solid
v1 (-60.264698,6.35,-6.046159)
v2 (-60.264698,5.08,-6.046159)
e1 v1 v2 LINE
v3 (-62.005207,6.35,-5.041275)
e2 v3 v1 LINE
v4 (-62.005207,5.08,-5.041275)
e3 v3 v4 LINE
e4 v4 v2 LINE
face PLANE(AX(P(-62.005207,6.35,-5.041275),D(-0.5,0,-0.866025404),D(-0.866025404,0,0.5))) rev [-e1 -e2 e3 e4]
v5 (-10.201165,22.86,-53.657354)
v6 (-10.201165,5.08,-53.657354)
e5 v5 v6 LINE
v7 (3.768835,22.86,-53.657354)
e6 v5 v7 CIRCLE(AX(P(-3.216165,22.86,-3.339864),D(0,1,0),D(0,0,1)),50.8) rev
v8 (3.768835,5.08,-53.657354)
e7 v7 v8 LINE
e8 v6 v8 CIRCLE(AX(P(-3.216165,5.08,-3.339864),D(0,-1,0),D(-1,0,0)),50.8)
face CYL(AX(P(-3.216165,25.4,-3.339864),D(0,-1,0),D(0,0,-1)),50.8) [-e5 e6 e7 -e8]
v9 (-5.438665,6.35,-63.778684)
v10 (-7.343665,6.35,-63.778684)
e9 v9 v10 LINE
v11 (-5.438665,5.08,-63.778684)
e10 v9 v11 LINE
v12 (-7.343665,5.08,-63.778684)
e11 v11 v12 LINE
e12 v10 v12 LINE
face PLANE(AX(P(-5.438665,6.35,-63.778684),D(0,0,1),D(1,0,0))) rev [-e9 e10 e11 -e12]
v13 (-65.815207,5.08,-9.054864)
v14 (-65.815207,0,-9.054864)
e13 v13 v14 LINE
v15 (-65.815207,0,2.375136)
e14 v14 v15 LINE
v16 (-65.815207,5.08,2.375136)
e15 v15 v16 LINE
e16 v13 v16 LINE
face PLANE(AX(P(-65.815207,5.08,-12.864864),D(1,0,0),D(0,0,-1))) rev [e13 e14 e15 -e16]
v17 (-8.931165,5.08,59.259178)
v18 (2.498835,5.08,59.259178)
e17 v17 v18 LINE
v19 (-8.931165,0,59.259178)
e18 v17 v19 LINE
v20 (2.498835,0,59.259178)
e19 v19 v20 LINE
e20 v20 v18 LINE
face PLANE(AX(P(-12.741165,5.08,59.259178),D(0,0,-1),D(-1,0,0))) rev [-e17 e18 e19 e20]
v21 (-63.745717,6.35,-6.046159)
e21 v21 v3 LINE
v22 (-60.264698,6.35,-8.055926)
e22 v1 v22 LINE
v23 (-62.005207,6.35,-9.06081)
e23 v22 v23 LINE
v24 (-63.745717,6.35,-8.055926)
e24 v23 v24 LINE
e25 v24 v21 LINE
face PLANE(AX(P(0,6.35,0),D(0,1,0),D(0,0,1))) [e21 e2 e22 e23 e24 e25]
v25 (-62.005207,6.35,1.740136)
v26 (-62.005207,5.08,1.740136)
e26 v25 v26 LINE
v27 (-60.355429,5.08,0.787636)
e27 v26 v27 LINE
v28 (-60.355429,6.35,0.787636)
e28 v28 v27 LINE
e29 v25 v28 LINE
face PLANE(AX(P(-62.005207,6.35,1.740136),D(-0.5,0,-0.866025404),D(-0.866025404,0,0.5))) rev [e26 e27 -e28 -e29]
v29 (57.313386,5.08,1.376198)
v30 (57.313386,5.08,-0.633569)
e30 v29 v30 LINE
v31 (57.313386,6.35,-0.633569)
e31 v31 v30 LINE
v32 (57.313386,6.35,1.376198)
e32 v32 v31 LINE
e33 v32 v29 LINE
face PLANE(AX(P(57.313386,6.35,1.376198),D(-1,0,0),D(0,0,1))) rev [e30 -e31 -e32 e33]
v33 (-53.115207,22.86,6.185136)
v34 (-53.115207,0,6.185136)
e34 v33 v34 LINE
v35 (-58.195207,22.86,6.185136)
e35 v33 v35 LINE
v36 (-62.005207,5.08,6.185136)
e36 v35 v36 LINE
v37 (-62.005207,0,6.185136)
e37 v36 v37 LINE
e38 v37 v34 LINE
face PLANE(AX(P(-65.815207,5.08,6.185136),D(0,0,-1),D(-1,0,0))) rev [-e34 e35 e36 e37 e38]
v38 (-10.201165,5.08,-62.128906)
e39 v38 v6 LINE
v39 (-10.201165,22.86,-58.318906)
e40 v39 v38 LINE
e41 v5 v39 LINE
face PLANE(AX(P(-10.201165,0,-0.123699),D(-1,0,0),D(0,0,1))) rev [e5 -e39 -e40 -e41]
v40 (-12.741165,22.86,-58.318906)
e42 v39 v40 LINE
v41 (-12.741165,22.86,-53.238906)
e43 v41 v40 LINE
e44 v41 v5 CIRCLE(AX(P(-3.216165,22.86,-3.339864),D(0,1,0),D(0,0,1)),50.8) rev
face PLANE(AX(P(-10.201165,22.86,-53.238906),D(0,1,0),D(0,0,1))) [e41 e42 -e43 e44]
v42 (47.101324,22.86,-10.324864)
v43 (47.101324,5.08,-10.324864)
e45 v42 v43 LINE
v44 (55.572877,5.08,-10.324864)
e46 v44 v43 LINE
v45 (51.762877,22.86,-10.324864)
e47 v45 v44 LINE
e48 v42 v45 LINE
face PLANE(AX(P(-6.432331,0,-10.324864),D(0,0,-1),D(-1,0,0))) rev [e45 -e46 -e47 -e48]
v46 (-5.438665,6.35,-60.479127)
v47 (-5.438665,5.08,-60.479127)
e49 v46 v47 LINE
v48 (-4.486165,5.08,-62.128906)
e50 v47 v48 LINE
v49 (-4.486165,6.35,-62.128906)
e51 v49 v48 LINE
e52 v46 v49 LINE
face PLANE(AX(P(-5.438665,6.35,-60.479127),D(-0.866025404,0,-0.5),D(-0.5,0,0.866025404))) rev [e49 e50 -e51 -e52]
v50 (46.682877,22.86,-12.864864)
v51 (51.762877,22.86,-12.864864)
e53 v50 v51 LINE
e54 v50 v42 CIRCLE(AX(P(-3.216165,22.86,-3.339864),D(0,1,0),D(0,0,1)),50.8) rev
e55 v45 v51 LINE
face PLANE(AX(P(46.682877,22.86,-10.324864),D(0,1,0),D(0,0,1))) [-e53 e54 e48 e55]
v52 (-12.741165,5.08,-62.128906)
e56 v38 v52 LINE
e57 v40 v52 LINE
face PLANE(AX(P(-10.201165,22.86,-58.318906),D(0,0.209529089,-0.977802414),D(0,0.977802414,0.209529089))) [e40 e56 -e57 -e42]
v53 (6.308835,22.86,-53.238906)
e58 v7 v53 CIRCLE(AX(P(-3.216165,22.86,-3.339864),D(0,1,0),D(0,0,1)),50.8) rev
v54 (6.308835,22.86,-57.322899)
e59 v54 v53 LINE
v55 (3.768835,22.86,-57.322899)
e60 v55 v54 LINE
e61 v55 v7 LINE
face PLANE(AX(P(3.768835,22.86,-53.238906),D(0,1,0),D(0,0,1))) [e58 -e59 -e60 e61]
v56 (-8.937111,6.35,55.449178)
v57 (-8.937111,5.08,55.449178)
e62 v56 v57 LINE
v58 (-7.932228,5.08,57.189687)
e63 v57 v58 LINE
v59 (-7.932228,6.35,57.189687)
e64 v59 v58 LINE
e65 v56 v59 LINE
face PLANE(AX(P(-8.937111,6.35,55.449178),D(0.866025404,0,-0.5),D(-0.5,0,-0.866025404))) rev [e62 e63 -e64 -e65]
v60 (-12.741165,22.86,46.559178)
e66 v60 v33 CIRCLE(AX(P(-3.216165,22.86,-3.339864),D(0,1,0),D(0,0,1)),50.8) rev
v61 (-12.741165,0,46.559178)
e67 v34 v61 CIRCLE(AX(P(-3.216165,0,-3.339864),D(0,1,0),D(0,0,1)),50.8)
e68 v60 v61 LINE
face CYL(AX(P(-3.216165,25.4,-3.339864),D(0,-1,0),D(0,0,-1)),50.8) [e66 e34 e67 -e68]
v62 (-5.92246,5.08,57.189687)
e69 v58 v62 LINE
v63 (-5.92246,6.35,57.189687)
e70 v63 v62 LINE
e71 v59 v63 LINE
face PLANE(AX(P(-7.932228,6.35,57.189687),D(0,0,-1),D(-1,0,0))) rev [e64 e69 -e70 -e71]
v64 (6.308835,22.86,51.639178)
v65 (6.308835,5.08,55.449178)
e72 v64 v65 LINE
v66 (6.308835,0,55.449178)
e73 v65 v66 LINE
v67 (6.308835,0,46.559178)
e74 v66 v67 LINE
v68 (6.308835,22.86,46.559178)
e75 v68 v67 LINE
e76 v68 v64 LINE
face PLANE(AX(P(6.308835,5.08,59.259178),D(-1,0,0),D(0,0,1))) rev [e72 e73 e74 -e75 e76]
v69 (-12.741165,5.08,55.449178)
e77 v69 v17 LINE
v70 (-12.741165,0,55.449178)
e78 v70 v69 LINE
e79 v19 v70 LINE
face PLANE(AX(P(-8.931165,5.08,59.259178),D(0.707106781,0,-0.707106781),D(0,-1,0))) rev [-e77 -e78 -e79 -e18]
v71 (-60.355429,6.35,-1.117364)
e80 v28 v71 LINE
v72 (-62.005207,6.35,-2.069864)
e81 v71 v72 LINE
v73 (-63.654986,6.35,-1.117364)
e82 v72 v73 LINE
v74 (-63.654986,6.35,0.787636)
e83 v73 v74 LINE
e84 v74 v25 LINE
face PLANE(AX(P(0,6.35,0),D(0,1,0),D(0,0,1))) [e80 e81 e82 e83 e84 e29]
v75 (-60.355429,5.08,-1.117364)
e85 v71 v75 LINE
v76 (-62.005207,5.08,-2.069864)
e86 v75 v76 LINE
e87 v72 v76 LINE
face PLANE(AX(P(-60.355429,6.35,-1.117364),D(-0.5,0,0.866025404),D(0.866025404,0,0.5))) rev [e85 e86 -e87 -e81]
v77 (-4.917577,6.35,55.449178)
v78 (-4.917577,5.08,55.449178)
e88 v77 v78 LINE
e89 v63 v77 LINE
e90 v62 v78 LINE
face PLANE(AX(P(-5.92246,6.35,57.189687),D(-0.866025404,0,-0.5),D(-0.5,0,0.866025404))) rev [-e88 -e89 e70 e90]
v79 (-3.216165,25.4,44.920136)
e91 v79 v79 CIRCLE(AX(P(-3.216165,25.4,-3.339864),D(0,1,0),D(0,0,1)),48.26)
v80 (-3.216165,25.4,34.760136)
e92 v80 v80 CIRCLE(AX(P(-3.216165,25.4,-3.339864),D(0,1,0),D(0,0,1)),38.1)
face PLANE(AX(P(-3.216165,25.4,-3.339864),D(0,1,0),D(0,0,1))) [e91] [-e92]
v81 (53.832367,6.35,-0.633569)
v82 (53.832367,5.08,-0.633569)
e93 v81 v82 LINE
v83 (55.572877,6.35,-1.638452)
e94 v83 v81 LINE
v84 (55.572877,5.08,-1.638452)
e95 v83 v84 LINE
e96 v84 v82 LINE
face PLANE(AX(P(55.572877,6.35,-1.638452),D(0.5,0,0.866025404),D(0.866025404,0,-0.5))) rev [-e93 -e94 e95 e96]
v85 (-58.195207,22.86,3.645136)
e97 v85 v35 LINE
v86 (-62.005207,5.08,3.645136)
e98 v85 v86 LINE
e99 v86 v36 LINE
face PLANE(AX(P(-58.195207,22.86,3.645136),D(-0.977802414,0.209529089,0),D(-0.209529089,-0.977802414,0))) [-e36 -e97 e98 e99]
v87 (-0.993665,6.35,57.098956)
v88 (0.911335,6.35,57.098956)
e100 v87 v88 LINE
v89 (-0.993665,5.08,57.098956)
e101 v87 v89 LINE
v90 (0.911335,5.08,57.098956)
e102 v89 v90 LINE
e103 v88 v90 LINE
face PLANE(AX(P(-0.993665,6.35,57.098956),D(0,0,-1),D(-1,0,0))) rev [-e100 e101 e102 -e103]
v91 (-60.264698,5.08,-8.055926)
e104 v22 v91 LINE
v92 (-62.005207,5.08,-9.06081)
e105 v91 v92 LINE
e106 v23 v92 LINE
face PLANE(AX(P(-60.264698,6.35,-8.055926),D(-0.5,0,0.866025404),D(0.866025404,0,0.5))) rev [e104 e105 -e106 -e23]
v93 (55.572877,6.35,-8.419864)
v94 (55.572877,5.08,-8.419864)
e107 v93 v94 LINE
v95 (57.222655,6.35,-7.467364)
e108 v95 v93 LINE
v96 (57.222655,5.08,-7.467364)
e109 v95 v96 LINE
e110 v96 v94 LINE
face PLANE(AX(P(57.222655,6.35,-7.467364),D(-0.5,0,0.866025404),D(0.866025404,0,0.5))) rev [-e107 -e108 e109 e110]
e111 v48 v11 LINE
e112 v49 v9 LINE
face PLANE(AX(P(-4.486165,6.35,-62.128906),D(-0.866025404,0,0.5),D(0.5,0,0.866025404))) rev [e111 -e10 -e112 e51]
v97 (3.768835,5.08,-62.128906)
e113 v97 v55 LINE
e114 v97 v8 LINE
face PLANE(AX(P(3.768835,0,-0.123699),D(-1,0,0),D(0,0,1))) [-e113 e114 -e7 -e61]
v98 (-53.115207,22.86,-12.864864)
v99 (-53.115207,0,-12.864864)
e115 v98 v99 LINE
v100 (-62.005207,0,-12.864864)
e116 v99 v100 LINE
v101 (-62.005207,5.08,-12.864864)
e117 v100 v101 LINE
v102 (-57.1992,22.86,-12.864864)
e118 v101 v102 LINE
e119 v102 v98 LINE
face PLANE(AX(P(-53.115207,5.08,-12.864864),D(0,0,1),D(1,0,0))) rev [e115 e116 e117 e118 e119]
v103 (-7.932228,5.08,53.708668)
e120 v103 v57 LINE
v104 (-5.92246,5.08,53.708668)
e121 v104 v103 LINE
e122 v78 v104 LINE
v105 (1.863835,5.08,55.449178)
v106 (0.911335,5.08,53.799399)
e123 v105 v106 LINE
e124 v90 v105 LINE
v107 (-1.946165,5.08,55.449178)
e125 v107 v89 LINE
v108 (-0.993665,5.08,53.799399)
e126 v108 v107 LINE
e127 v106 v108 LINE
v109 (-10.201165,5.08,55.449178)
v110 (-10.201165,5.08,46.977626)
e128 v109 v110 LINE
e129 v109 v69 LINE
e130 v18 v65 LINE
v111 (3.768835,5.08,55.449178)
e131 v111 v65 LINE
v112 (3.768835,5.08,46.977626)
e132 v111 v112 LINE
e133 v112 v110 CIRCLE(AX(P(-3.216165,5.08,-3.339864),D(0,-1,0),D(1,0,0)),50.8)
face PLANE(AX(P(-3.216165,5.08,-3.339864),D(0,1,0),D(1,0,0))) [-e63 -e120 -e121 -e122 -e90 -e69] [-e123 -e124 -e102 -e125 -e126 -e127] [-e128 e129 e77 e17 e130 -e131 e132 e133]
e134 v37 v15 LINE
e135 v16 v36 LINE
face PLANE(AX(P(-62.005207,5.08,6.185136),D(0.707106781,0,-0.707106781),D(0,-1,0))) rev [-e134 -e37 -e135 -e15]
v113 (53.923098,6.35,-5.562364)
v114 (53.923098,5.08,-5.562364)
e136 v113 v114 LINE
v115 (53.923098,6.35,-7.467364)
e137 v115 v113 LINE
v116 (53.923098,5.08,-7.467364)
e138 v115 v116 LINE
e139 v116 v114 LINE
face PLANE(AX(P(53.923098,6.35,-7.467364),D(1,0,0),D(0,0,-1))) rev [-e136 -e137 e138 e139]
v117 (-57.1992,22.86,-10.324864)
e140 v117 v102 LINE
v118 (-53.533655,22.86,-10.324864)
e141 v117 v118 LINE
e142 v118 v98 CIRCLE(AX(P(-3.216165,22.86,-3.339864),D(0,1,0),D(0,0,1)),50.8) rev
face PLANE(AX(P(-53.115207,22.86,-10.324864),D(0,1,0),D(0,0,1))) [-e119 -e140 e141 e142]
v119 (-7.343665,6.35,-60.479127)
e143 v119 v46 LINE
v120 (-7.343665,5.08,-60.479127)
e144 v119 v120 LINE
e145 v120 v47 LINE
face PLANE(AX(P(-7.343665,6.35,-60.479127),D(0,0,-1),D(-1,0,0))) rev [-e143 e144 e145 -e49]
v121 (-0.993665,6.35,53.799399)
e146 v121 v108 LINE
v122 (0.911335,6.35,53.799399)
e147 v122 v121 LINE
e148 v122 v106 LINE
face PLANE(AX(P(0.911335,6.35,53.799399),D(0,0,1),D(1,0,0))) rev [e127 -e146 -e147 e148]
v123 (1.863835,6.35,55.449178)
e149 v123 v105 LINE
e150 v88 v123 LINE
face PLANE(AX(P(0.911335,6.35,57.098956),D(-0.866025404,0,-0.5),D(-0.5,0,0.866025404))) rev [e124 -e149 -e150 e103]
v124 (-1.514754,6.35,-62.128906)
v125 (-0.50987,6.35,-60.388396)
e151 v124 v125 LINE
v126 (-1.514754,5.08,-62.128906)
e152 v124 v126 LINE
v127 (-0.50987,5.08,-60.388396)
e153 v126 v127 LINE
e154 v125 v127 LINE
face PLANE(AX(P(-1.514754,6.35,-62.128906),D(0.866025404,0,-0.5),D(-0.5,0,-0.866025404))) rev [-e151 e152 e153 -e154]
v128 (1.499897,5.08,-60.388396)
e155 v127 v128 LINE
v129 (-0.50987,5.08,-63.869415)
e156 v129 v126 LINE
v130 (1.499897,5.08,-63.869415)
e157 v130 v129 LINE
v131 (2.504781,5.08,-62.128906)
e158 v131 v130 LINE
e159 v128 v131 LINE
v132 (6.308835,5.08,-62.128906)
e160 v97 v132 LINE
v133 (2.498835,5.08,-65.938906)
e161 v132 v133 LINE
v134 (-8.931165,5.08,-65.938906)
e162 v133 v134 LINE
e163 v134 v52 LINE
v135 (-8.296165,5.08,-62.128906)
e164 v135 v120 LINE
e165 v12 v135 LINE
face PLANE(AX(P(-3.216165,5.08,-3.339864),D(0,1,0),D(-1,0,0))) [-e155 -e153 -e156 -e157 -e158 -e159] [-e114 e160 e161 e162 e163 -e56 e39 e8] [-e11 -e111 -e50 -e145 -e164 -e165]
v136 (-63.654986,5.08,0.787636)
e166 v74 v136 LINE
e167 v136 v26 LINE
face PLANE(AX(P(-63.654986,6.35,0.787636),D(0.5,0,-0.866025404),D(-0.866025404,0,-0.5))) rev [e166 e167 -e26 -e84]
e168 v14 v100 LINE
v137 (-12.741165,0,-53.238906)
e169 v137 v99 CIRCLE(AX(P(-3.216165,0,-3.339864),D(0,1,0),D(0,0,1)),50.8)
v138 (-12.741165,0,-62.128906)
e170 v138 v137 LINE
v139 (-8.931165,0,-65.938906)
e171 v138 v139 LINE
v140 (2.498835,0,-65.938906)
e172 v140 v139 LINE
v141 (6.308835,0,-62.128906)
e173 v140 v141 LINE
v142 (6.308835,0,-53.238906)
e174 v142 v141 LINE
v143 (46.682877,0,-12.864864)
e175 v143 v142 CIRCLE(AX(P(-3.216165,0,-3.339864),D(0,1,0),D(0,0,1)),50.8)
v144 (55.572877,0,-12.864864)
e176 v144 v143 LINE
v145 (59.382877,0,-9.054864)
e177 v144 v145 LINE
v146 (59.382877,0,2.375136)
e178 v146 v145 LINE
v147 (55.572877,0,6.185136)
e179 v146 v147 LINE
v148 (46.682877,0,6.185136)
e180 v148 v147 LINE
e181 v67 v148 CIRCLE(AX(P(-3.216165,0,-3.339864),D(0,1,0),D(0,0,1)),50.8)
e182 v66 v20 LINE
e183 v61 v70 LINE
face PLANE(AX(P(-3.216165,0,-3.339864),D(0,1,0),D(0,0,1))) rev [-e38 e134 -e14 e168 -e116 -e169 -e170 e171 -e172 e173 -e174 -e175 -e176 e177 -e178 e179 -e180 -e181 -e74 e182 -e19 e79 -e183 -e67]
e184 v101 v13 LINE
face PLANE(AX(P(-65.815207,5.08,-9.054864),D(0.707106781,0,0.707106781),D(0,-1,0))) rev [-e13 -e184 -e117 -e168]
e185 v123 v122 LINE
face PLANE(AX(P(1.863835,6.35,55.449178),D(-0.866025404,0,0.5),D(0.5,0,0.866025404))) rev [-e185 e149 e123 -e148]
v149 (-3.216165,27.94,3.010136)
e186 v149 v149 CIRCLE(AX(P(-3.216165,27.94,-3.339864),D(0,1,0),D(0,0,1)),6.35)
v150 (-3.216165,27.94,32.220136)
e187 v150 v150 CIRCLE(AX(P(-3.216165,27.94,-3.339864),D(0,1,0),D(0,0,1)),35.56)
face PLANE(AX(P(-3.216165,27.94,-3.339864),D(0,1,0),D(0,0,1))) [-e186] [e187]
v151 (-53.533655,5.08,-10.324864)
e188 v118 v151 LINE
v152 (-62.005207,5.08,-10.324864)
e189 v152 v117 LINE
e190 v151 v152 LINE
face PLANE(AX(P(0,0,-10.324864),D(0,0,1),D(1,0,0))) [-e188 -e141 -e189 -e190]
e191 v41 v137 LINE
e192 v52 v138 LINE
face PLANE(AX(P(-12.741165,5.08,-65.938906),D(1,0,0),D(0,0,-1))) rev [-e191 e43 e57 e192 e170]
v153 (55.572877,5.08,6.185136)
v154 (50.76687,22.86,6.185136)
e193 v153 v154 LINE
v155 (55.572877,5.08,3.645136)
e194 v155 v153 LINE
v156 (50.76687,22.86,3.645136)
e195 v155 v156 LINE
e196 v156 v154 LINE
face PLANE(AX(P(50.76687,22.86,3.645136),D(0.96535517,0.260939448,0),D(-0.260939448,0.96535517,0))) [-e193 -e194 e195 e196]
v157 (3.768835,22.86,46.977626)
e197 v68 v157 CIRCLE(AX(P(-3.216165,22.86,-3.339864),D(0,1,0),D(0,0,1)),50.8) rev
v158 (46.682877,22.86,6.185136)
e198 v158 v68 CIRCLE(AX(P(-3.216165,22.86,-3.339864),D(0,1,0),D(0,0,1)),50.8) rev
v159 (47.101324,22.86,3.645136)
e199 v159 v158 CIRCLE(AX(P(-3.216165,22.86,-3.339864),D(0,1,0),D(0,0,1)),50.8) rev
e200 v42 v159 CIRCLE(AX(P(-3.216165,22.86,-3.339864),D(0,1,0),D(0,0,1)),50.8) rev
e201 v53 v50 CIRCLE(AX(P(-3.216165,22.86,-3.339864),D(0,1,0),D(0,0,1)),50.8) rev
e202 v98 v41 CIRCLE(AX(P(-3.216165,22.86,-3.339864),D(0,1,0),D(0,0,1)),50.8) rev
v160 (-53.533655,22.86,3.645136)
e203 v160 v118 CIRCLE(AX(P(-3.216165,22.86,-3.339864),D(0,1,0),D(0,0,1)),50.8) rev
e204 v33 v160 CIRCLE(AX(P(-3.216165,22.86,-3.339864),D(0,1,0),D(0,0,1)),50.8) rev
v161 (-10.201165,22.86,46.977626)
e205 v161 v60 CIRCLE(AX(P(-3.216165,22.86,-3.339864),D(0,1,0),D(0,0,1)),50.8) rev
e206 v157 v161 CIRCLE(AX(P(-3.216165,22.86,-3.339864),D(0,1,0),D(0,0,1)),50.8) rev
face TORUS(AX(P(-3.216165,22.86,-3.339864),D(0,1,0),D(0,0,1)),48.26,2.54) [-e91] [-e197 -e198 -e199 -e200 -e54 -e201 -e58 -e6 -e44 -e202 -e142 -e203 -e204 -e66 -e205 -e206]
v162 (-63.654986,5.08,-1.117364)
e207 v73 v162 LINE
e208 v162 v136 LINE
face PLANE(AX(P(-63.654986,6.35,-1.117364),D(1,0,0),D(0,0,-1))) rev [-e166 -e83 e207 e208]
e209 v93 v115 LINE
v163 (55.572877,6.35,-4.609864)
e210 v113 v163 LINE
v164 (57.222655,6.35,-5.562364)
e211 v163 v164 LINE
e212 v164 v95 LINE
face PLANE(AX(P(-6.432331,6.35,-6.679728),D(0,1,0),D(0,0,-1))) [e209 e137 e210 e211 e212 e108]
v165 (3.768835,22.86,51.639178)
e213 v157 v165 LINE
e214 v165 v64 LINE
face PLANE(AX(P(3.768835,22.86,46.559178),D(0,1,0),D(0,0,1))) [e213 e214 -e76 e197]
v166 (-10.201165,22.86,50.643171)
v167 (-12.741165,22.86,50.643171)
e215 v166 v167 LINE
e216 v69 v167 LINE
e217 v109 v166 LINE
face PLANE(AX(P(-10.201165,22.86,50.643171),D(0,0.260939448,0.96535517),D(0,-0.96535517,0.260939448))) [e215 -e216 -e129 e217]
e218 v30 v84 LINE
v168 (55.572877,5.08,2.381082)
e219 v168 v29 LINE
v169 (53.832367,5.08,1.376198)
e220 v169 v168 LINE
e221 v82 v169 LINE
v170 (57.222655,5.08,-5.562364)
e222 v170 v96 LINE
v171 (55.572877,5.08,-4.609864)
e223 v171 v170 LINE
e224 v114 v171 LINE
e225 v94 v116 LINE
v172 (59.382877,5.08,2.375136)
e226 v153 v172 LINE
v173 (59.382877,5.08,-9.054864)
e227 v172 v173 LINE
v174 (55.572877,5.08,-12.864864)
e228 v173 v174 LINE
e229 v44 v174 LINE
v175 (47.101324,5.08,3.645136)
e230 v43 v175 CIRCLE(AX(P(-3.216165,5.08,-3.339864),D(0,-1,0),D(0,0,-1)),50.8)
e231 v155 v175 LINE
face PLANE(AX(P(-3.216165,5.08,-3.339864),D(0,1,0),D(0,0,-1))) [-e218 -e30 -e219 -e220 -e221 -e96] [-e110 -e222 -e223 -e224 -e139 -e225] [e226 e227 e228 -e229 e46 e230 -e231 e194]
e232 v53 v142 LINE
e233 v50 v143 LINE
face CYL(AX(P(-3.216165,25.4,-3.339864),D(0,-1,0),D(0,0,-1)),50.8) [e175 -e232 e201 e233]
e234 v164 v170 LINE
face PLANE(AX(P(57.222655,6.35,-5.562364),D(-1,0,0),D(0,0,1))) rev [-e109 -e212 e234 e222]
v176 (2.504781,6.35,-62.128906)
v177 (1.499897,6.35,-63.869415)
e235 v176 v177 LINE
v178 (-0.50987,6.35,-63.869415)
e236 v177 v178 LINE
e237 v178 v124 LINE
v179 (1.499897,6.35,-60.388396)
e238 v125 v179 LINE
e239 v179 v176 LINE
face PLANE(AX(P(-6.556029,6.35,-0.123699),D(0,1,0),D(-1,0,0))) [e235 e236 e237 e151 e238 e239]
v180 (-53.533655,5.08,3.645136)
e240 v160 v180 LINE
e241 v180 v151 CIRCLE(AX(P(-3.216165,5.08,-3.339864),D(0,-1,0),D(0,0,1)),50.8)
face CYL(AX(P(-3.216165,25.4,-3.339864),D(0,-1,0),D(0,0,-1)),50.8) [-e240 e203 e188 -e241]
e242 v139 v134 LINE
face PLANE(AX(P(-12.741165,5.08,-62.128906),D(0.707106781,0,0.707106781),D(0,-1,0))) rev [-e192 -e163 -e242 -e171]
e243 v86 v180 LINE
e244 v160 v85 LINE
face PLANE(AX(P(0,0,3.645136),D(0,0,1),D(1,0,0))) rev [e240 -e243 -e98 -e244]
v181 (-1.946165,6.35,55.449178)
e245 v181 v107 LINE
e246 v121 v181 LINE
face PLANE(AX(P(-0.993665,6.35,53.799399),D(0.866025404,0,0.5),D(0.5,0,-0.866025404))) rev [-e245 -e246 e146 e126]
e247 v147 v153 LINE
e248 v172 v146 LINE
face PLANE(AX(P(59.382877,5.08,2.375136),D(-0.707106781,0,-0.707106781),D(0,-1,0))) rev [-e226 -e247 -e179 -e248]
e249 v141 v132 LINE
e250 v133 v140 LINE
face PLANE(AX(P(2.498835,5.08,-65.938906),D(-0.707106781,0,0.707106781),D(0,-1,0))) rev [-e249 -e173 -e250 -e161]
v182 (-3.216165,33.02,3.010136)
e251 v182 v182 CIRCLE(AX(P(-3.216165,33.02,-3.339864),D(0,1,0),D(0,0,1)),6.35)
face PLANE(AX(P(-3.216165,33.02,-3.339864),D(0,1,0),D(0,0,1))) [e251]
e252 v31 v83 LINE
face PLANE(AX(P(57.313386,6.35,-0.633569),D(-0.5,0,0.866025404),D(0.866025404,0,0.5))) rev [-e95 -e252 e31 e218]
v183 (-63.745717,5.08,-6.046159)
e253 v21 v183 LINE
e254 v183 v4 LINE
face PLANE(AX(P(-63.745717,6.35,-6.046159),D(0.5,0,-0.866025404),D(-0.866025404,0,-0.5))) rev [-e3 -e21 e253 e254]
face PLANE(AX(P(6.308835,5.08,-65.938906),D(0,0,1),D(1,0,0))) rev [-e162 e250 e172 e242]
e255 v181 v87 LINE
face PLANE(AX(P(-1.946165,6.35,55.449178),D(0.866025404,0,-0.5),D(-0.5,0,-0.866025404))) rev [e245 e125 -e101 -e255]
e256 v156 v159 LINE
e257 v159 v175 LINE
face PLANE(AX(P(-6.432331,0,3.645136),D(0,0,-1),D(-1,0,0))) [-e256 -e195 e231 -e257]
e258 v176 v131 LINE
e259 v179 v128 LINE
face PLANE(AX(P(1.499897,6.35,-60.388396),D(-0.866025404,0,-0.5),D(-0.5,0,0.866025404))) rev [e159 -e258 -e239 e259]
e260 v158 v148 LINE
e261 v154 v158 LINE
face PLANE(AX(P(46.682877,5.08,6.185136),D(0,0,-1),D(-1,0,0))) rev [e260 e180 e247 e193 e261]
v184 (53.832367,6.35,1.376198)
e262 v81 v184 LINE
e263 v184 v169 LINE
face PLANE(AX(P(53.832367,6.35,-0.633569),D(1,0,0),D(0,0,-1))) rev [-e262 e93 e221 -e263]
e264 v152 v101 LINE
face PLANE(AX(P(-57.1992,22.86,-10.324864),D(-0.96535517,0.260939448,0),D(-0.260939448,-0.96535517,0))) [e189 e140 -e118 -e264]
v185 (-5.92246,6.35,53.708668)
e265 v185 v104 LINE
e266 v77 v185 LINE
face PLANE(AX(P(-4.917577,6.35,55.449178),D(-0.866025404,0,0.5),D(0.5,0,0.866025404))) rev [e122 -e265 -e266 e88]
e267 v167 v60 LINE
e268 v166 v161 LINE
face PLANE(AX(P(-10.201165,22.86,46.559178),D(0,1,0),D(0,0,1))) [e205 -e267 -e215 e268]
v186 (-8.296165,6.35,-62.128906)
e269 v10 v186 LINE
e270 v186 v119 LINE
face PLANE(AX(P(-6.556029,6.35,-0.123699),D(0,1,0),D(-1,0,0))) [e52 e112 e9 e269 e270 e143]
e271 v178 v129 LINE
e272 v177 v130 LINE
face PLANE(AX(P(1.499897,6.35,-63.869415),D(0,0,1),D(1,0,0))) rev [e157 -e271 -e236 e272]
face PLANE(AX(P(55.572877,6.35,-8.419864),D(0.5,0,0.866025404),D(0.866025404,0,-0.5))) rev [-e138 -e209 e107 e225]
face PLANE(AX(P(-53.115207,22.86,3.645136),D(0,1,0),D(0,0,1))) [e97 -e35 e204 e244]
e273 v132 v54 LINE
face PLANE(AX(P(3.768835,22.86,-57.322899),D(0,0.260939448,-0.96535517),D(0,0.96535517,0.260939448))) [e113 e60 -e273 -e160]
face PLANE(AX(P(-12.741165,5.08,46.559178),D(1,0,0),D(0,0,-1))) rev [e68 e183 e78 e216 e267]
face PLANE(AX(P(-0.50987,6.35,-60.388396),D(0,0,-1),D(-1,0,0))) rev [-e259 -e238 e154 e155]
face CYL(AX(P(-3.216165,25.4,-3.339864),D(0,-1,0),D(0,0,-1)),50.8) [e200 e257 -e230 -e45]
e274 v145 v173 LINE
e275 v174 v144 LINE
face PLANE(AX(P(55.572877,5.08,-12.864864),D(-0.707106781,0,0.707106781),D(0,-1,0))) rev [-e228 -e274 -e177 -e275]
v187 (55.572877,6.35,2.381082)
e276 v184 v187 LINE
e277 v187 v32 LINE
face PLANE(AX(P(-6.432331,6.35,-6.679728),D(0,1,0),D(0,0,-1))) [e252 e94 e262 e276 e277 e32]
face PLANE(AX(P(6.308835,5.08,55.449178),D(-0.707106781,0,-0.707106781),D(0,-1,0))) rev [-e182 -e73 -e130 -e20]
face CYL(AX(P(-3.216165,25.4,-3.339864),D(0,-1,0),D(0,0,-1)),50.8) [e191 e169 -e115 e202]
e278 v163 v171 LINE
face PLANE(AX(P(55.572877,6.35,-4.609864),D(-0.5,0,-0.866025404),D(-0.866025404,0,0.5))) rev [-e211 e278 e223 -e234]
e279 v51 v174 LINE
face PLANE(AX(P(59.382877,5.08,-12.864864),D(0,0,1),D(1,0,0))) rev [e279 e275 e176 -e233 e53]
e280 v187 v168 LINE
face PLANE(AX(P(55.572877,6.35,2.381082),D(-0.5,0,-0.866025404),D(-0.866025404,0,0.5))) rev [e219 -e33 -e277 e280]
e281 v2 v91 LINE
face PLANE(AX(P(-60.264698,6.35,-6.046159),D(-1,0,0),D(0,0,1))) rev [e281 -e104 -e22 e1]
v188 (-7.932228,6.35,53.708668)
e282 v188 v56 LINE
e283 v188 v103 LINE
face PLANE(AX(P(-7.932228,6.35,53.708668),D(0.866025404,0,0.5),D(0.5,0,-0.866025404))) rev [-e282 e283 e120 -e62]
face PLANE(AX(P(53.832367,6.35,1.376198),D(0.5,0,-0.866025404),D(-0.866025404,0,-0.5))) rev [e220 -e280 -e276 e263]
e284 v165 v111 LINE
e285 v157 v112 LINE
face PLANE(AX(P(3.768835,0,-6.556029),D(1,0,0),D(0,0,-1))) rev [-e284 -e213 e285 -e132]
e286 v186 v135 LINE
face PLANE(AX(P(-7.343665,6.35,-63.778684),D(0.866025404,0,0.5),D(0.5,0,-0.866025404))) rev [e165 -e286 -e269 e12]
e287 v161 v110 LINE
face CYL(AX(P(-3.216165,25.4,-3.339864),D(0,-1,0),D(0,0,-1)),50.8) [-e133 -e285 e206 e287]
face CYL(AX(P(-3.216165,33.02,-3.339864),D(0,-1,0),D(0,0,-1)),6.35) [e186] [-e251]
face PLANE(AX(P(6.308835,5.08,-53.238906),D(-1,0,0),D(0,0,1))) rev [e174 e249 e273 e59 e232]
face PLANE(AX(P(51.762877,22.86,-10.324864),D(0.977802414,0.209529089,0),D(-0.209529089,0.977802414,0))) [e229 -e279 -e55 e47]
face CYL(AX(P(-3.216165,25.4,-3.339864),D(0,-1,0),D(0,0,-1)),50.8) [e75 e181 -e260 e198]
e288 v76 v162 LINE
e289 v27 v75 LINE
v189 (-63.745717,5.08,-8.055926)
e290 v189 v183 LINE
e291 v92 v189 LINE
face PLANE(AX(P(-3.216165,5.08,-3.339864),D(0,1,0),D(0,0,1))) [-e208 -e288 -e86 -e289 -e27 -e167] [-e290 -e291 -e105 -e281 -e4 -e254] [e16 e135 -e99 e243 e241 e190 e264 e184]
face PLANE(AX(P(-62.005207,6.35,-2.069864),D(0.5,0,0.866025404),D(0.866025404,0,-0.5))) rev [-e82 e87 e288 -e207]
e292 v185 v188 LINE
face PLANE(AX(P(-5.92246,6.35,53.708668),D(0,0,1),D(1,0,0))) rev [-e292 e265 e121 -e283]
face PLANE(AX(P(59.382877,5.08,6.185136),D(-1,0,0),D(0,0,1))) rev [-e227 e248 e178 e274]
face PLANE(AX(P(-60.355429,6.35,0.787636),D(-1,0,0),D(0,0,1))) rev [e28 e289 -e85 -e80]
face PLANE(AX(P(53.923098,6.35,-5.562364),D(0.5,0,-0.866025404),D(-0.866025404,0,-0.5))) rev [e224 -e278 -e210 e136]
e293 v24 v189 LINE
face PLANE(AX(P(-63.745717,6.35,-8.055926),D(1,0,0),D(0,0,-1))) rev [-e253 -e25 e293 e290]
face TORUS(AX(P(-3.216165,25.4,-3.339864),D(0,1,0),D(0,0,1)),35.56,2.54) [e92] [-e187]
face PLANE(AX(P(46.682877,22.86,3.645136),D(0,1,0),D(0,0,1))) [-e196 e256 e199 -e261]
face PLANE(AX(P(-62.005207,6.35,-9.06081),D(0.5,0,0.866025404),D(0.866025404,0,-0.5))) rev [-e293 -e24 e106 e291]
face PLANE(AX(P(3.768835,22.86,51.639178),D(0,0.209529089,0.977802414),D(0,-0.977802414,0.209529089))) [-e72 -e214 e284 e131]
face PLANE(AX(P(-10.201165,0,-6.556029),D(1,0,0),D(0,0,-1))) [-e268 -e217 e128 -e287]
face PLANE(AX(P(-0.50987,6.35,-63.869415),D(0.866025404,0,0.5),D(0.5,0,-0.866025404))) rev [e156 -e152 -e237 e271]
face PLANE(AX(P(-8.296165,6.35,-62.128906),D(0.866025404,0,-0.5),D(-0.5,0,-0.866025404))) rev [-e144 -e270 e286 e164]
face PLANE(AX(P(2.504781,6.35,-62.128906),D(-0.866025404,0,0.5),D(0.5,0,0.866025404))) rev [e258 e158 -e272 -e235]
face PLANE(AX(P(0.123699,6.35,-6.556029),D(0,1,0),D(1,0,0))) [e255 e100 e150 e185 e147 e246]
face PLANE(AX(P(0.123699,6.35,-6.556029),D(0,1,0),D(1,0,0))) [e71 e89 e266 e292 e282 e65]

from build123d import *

# Parameters (mm, degrees)
SKETCH2_R                    = 50.8
BOSS_EXTRUDE1_DEPTH          = 25.4
FILLET1_R                    = 2.54
BOSS_EXTRUDE2_START          = -25.4
BOSS_EXTRUDE2_DEPTH          = 5.08
CHAMFER1_SIZE                = 3.81
BOSS_EXTRUDE3_DEPTH          = 2.54
BOSS_EXTRUDE4_DEPTH          = 1.27
BOSS_EXTRUDE6_DEPTH          = 2.54
BOSS_EXTRUDE7_DEPTH          = 1.27
CIRPATTERN1_COUNT            = 4
CHAMFER1_OF_CIRPATTERN1_SIZE = 3.81
CIRPATTERN2_COUNT            = 4
SKETCH12_R                   = 38.1
BOSS_EXTRUDE8_DEPTH          = 2.54
FILLET2_R                    = 2.54
SKETCH13_R                   = 6.35
BOSS_EXTRUDE9_DEPTH          = 5.08


with BuildPart() as part:
    # Sketch2 → Boss-Extrude1 (new body)
    with BuildSketch(Plane(origin=(0, 0, 0), x_dir=(1, 0, 0), z_dir=(0, 1, 0))):
        with Locations(Location((-3.216165312, 3.339863978, 0), (0, 0, 270))):
            Circle(SKETCH2_R)
    extrude(amount=BOSS_EXTRUDE1_DEPTH)

    # Fillet1
    fillet1_edges = [part.edges().sort_by_distance(p)[0] for p in [
        (-3.216165312, 25.4, -54.139863978),
    ]]
    fillet(fillet1_edges, radius=FILLET1_R)

    # Sketch3 → Boss-Extrude2 (add)
    with BuildSketch(Plane(origin=(0, 25.4, 0), x_dir=(1, 0, 0), z_dir=(0, 1, 0)).offset(BOSS_EXTRUDE2_START)):
        with BuildLine():
            Line((-53.115207137, 12.864863978), (-65.815207137, 12.864863978))
            Line((-65.815207137, 12.864863978), (-65.815207137, -6.185136022))
            Line((-65.815207137, -6.185136022), (-53.115207137, -6.185136022))
            ThreePointArc((-53.115207137, -6.185136022), (-54.016165312, 3.339863978), (-53.115207137, 12.864863978))
        make_face()
    boss_extrude2 = extrude(amount=BOSS_EXTRUDE2_DEPTH)

    # Chamfer1
    chamfer1_edges = [part.edges().sort_by_distance(p)[0] for p in [
        (-65.815207137, 2.54, -12.864863978),
        (-65.815207137, 2.54, 6.185136022),
    ]]
    chamfer(chamfer1_edges, length=CHAMFER1_SIZE)

    # Sketch4 → Boss-Extrude3 (add)
    with BuildSketch(Plane.XY.offset(6.185136022)):
        Polygon((-53.115207137, 5.08), (-53.115207137, 22.86), (-58.195207137, 22.86), (-62.005207137, 5.08), align=None)
    boss_extrude3 = extrude(amount=-BOSS_EXTRUDE3_DEPTH)

    # Sketch5 → Boss-Extrude4 (add)
    with BuildSketch(Plane(origin=(0, 5.08, 0), x_dir=(1, 0, 0), z_dir=(0, 1, 0))):
        Polygon((-63.654985531, -0.787636022), (-62.005207137, -1.740136022), (-60.355428742, -0.787636022), (-60.355428742, 1.117363978), (-62.005207137, 2.069863978), (-63.654985531, 1.117363978), align=None)
    boss_extrude4 = extrude(amount=BOSS_EXTRUDE4_DEPTH)

    # Sketch10 → Boss-Extrude6 (add)
    with BuildSketch(Plane(origin=(0, 0, -12.864863978), x_dir=(-1, 0, 0), z_dir=(0, 0, -1))):
        Polygon((53.115207137, 5.08), (53.115207137, 22.86), (57.19920047, 22.86), (62.005207137, 5.08), align=None)
    boss_extrude6 = extrude(amount=-BOSS_EXTRUDE6_DEPTH)

    # Sketch11 → Boss-Extrude7 (add)
    with BuildSketch(Plane(origin=(0, 5.08, 0), x_dir=(1, 0, 0), z_dir=(0, 1, 0))):
        Polygon((-63.745716673, 6.046159142), (-62.005207137, 5.041275493), (-60.264697601, 6.046159142), (-60.264697601, 8.05592644), (-62.005207137, 9.060810089), (-63.745716673, 8.05592644), align=None)
    boss_extrude7 = extrude(amount=BOSS_EXTRUDE7_DEPTH)

    # CirPattern1: Boss-Extrude2, Boss-Extrude3, Boss-Extrude6 ×4 about axis
    cirpattern1_axis = Axis((-3.216165312, 0, -3.339863978), (0, 1, 0))
    add([boss_extrude2.rotate(cirpattern1_axis, i * 360 / CIRPATTERN1_COUNT) for i in range(1, CIRPATTERN1_COUNT)])
    add([boss_extrude3.rotate(cirpattern1_axis, i * 360 / CIRPATTERN1_COUNT) for i in range(1, CIRPATTERN1_COUNT)])
    add([boss_extrude6.rotate(cirpattern1_axis, i * 360 / CIRPATTERN1_COUNT) for i in range(1, CIRPATTERN1_COUNT)])

    # Chamfer1 of CirPattern1
    chamfer1_of_cirpattern1_edges = [part.edges().sort_by_distance(p)[0] for p in [
        (-12.741165312, 2.54, 59.259177846),
        (6.308834688, 2.54, 59.259177846),
        (59.382876512, 2.54, 6.185136022),
        (59.382876512, 2.54, -12.864863978),
        (6.308834688, 2.54, -65.938905803),
        (-12.741165312, 2.54, -65.938905803),
    ]]
    chamfer(chamfer1_of_cirpattern1_edges, length=CHAMFER1_OF_CIRPATTERN1_SIZE)

    # CirPattern2: Boss-Extrude4, Boss-Extrude7 ×4 about axis
    cirpattern2_axis = Axis((-3.216165312, 0, -3.339863978), (0, 1, 0))
    add([boss_extrude4.rotate(cirpattern2_axis, i * 360 / CIRPATTERN2_COUNT) for i in range(1, CIRPATTERN2_COUNT)])
    add([boss_extrude7.rotate(cirpattern2_axis, i * 360 / CIRPATTERN2_COUNT) for i in range(1, CIRPATTERN2_COUNT)])

    # Sketch12 → Boss-Extrude8 (add)
    with BuildSketch(Plane(origin=(0, 25.4, 0), x_dir=(1, 0, 0), z_dir=(0, 1, 0))):
        with Locations(Location((-3.216165312, 3.339863978, 0), (0, 0, 270))):
            Circle(SKETCH12_R)
    extrude(amount=BOSS_EXTRUDE8_DEPTH)

    # Fillet2
    fillet2_edges = [part.edges().sort_by_distance(p)[0] for p in [
        (-3.216165312, 27.94, -41.439863978),
    ]]
    fillet(fillet2_edges, radius=FILLET2_R - 0.0001)  # a hair under: the kernel refuses the full size

    # Sketch13 → Boss-Extrude9 (add)
    with BuildSketch(Plane(origin=(0, 27.94, 0), x_dir=(1, 0, 0), z_dir=(0, 1, 0))):
        with Locations(Location((-3.216165312, 3.339863978, 0), (0, 0, 270))):
            Circle(SKETCH13_R)
    extrude(amount=BOSS_EXTRUDE9_DEPTH)


solid = part.part
